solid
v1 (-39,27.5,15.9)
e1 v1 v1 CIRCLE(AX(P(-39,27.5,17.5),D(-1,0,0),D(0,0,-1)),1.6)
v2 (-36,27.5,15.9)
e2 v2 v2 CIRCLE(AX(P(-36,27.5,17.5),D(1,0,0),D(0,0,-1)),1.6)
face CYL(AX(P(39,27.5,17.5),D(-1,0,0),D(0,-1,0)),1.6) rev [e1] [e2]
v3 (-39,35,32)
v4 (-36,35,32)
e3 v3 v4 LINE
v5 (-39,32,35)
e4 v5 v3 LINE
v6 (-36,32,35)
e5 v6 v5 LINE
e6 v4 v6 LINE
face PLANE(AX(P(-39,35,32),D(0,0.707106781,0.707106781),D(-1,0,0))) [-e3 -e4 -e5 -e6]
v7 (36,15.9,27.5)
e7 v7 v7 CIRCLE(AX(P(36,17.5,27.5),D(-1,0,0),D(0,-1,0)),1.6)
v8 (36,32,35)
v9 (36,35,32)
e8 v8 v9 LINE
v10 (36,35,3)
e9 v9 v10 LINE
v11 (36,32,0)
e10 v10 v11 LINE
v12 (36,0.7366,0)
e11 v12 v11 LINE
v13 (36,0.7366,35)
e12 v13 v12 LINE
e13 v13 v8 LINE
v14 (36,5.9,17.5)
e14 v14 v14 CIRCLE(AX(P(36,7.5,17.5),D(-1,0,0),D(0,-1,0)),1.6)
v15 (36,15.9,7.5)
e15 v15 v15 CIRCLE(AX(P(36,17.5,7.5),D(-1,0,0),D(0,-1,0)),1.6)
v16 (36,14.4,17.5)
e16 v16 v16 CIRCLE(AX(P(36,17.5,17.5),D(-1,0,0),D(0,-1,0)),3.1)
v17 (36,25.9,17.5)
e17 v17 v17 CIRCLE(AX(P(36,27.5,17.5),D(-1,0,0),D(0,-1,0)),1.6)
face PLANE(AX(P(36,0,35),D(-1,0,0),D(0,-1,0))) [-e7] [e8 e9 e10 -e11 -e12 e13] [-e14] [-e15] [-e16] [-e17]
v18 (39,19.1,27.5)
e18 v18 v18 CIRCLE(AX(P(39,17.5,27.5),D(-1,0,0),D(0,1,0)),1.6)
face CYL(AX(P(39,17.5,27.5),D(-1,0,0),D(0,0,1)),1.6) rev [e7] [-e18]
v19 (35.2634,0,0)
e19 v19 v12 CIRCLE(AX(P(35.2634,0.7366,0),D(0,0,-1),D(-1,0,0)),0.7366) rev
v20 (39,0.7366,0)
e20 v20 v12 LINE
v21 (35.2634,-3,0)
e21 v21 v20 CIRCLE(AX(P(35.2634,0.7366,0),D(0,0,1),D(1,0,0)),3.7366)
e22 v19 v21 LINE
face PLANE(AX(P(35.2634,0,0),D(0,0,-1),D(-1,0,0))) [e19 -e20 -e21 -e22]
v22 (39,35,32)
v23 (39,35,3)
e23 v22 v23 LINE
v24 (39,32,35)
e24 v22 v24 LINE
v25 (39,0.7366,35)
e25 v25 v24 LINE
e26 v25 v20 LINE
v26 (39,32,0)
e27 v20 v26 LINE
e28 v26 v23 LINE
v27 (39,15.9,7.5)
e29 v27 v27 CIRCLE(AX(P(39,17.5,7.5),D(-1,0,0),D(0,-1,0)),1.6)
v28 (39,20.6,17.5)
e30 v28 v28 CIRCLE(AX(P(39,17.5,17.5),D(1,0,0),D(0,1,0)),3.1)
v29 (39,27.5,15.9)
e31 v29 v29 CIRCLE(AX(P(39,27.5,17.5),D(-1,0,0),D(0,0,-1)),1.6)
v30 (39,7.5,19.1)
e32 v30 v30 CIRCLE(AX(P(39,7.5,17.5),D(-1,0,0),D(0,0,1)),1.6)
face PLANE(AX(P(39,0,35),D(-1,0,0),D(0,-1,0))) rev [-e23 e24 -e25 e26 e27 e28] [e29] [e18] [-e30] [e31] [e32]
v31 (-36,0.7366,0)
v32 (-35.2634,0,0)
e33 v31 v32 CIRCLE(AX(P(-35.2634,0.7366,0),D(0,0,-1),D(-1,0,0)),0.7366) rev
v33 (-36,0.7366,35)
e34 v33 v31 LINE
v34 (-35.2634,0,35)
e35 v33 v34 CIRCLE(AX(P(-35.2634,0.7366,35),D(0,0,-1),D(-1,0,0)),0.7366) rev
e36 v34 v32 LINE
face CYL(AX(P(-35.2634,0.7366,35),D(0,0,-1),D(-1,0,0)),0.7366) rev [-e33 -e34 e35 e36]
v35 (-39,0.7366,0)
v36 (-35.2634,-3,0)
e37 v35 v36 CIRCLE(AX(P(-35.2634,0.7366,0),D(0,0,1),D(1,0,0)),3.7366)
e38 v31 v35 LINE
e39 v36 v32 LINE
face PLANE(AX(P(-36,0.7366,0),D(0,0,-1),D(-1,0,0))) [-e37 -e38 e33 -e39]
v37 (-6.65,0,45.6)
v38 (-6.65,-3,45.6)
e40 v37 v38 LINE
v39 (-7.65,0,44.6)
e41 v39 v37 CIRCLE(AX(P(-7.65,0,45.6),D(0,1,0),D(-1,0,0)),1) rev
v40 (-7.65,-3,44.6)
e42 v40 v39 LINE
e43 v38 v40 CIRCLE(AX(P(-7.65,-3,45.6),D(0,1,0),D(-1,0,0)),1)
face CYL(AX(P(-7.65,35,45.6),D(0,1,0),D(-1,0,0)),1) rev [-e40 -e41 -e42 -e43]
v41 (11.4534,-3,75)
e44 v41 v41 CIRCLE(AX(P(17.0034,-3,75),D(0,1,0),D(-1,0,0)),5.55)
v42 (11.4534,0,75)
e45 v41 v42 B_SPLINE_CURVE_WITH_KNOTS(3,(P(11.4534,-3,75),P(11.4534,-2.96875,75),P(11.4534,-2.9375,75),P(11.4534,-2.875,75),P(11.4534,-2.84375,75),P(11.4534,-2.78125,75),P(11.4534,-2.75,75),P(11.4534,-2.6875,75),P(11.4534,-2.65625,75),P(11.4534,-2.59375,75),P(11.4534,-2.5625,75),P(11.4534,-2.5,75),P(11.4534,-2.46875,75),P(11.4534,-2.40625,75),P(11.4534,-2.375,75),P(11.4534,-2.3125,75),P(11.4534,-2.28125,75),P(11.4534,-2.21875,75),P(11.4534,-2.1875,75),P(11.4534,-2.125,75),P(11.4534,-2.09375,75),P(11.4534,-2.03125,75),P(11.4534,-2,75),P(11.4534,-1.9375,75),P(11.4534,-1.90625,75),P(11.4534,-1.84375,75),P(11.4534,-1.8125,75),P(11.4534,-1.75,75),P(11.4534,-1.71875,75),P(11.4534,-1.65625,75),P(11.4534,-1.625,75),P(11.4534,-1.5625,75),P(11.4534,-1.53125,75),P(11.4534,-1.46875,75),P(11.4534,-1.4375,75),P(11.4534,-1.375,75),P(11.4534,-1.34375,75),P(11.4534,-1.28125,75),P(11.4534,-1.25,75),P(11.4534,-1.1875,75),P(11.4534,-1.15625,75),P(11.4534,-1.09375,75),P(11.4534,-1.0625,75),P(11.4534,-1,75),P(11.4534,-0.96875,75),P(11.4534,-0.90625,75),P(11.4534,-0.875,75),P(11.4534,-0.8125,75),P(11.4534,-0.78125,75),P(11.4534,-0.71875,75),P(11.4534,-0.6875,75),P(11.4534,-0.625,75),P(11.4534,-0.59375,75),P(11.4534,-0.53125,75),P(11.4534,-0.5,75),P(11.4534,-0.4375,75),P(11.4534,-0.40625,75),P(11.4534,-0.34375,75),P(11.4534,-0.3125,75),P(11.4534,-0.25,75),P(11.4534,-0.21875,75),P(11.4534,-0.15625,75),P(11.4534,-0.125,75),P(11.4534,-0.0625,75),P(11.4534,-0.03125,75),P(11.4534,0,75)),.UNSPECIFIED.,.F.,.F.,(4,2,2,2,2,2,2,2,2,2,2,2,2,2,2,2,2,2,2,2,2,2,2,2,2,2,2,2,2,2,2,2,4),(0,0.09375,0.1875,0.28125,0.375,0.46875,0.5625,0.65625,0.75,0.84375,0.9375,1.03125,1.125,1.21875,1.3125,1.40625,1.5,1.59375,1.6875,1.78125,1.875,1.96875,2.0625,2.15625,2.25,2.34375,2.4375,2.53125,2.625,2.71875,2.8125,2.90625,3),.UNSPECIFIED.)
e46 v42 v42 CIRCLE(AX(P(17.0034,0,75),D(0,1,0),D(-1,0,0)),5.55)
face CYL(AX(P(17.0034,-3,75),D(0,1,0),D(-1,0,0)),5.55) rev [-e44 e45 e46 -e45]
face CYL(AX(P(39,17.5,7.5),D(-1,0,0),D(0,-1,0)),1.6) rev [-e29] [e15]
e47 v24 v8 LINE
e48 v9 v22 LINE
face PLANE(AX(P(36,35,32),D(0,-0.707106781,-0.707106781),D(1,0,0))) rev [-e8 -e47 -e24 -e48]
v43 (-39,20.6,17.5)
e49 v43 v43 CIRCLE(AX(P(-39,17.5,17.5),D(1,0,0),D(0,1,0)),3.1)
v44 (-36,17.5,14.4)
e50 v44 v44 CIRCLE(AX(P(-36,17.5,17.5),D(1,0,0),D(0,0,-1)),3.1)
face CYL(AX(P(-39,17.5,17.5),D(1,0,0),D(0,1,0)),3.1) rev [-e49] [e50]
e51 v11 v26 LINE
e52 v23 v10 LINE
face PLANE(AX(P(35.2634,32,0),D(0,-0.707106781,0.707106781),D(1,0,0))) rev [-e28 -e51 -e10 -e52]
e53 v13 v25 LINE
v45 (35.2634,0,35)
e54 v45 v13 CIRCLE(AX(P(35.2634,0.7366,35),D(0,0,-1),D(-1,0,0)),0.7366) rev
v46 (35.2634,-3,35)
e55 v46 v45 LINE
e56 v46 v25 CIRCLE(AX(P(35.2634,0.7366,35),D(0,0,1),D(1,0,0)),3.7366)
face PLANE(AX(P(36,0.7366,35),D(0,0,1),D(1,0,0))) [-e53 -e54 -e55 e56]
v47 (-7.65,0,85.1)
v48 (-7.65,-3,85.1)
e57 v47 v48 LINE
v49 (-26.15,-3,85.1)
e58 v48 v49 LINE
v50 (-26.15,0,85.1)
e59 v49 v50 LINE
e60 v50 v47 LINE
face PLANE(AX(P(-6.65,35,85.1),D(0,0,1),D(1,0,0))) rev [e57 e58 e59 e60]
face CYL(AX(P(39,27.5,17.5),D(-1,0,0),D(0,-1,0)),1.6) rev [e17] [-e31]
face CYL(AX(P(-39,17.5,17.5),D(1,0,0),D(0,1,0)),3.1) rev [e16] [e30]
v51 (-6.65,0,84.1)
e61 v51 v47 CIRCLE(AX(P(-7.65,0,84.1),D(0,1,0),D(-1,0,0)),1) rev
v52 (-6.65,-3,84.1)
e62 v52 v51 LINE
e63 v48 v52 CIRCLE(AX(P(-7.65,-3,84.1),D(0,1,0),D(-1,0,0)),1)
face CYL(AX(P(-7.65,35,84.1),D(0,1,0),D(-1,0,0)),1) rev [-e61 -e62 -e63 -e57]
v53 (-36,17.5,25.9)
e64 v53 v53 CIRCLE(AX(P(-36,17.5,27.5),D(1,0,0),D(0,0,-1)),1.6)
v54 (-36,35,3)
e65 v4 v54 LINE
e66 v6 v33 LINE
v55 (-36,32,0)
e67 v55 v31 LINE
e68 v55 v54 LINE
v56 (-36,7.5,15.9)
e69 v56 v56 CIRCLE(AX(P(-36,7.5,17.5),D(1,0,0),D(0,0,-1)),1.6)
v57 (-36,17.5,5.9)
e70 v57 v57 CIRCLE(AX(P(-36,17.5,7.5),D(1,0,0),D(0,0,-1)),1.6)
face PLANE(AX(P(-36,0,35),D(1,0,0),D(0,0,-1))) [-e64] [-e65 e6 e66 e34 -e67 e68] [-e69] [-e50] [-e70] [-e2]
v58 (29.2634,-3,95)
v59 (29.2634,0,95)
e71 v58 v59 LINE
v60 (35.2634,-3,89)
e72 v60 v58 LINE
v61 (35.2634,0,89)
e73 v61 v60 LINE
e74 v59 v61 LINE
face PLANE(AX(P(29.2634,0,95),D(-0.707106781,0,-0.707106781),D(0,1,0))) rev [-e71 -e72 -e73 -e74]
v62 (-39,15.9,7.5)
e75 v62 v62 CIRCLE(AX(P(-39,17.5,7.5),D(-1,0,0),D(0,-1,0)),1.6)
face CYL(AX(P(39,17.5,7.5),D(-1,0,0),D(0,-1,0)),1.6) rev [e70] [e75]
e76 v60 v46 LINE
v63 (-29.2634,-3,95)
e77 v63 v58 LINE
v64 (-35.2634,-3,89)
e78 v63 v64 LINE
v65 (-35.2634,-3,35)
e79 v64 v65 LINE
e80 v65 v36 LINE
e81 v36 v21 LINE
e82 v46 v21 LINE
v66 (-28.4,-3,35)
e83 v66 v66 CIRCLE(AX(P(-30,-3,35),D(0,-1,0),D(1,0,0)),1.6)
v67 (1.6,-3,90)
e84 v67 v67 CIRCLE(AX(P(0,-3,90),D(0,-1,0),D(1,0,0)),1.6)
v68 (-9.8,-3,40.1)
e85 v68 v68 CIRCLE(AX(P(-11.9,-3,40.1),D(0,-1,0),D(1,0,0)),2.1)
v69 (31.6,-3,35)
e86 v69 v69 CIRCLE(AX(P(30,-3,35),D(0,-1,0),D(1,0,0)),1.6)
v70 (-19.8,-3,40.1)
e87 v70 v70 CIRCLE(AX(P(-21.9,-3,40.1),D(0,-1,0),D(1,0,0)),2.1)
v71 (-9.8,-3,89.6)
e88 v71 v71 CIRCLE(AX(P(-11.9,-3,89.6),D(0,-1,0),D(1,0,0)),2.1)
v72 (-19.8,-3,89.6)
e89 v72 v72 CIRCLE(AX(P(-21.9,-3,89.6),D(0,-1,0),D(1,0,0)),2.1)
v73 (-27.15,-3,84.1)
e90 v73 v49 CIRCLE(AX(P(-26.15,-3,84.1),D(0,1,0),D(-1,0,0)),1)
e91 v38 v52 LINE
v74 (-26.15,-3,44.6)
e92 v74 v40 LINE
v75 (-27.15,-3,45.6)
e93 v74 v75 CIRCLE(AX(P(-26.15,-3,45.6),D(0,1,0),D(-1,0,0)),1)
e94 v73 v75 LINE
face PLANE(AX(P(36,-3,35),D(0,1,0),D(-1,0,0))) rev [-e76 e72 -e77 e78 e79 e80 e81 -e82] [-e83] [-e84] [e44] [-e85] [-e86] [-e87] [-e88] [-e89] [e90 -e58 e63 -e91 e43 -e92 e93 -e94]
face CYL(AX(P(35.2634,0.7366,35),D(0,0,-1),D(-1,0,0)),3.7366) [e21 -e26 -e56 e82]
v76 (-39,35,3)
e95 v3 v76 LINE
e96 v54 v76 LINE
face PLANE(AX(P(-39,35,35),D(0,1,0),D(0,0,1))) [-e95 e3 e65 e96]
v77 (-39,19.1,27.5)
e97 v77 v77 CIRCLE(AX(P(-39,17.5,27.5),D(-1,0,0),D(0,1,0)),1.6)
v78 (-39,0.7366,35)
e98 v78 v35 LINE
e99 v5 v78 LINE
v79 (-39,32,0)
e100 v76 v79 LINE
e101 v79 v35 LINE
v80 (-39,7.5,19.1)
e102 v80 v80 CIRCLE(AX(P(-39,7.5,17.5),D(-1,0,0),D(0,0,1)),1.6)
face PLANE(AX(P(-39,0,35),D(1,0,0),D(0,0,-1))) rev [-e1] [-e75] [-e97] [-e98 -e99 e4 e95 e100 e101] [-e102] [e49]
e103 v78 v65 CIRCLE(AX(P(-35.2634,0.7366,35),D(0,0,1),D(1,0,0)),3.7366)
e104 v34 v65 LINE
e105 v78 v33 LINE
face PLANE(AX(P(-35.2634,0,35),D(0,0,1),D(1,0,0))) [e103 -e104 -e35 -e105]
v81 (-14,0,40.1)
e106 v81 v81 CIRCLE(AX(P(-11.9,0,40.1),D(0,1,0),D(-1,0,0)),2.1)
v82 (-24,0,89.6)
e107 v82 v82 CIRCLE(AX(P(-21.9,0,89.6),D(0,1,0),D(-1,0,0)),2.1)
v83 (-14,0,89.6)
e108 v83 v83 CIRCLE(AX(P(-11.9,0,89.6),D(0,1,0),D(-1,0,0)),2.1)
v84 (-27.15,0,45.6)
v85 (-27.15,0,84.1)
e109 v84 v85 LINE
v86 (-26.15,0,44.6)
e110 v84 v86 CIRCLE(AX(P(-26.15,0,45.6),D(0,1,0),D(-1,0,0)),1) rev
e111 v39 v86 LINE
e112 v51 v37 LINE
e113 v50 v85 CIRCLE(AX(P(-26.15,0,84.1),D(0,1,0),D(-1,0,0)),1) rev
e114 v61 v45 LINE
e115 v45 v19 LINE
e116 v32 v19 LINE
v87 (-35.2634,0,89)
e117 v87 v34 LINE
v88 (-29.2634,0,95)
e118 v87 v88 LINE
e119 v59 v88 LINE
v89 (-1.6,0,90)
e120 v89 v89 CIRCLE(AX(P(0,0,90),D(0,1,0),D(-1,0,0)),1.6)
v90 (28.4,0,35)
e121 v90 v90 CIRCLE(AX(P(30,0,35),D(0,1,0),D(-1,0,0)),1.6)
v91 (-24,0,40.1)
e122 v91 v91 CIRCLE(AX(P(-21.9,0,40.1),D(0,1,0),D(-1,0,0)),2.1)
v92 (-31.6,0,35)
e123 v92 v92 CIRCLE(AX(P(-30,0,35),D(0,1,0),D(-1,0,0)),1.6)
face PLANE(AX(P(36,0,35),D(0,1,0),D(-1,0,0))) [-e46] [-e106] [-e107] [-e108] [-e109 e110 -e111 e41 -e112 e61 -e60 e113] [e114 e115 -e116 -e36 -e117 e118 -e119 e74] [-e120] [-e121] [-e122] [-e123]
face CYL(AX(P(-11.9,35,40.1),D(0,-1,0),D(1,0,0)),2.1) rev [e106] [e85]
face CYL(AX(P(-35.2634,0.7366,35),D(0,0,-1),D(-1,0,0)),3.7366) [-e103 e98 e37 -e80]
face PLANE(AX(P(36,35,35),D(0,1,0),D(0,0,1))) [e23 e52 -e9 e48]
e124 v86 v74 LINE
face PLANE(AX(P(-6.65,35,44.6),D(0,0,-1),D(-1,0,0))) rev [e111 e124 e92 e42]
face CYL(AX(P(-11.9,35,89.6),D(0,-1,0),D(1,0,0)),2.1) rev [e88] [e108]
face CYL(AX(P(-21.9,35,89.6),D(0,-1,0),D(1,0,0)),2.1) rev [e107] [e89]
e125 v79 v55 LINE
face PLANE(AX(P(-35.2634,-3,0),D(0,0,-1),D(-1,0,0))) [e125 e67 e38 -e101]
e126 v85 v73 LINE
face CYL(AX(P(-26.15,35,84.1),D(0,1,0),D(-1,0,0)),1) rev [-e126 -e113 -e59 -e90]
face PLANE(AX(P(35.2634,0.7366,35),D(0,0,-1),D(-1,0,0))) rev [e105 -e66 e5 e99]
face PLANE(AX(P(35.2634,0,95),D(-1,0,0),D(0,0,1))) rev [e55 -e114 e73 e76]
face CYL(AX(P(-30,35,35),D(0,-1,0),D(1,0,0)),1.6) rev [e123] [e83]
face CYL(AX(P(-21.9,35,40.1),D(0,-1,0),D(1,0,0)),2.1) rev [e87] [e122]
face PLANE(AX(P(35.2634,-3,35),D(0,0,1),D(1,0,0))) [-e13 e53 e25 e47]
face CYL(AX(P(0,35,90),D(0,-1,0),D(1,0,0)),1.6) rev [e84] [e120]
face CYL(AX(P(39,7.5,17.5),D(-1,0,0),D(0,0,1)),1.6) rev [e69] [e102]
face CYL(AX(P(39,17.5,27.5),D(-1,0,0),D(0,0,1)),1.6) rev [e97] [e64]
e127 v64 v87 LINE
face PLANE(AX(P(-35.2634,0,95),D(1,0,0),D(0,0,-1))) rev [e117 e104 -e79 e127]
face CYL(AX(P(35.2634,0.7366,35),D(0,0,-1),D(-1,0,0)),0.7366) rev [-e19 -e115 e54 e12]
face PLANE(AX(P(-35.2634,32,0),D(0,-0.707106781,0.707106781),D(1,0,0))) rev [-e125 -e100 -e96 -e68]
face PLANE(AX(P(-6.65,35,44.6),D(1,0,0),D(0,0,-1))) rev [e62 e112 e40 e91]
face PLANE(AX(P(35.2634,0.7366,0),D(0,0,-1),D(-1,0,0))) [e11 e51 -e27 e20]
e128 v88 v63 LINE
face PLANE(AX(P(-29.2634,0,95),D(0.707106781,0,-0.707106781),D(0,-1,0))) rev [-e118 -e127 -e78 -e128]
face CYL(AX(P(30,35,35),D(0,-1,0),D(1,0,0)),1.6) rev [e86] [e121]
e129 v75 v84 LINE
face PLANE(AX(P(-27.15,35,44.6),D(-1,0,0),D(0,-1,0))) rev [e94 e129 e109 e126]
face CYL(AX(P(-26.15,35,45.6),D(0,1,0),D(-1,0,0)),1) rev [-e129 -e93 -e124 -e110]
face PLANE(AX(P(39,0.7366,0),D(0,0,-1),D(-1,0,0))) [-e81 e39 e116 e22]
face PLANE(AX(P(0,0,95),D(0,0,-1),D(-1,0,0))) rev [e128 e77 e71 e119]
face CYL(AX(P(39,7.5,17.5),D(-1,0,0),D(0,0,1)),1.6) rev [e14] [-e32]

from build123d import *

# Parameters (mm, degrees)
SM_BASE_FLANGE_1_DEPTH      = 35
SKETCH_7_W                  = 70.5268
SKETCH_7_H                  = 3
EXTRUDE_1_DEPTH             = 60
SKETCH_8_R                  = 3.1
CUT_EXTRUDE_1_DEPTH         = 128.804538261
SKETCH_9_R                  = 1.6
CUT_EXTRUDE_2_DEPTH         = 128.804538261
PATTERN_CIRCULAR_1_COUNT    = 4
SKETCH_10_W                 = 20.5
SKETCH_10_H                 = 40.5
CUT_EXTRUDE_3_DEPTH         = 110.498858442
SKETCH_11_R                 = 2.1
CUT_EXTRUDE_4_DEPTH         = 110.498858442
PATTERN_LINEAR_1_COUNT      = 2
PATTERN_LINEAR_1_PITCH      = 10
PATTERN_LINEAR_1_COUNT_DIR2 = 2
PATTERN_LINEAR_1_PITCH_DIR2 = 49.5
SKETCH_14_R                 = 5.55
CUT_EXTRUDE_7_DEPTH         = 109.494239478
FILLET_1_R                  = 1
CHAMFER_4_SIZE              = 3
CHAMFER_5_SIZE              = 6
SKETCH_15_R                 = 1.6
CUT_EXTRUDE_8_DEPTH         = 110.498858442
SKETCH_16_R                 = 1.6
CUT_EXTRUDE_9_DEPTH         = 110.498858442
PATTERN_LINEAR_2_COUNT      = 2
PATTERN_LINEAR_2_PITCH      = 60


# Sheet-metal steps are written as plain solids
with BuildPart() as part:
    # Sketch 2 → 基材-凸緣1 (new body)
    with BuildSketch(Plane.XY):
        with BuildLine():
            Line((36, 35), (36, 0.7366))
            ThreePointArc((36, 0.7366), (35.784254855, 0.215745145), (35.2634, 0))
            Line((35.2634, 0), (-35.2634, 0))
            ThreePointArc((-35.2634, 0), (-35.784254855, 0.215745145), (-36, 0.7366))
            Line((-36, 0.7366), (-36, 35))
            Line((-36, 35), (-39, 35))
            Line((-39, 35), (-39, 0.7366))
            ThreePointArc((-39, 0.7366), (-37.905575199, -1.905575199), (-35.2634, -3))
            Line((-35.2634, -3), (35.2634, -3))
            ThreePointArc((35.2634, -3), (37.905575199, -1.905575199), (39, 0.7366))
            Line((39, 0.7366), (39, 35))
            Line((39, 35), (36, 35))
        make_face()
    extrude(amount=SM_BASE_FLANGE_1_DEPTH)

    # 草圖7 → 填料-伸長1 (add)
    with BuildSketch(Plane.XY.offset(35)):
        with Locations((0, -1.5)):
            Rectangle(SKETCH_7_W, SKETCH_7_H)
    extrude(amount=EXTRUDE_1_DEPTH)

    # 草圖8 → 除料-伸長1 (cut, through all)
    with BuildSketch(Plane(origin=(39, 0, 0), x_dir=(0, 0, -1), z_dir=(1, 0, 0))):
        with Locations(Location((-17.5, 17.5, 0), (0, 0, 90))):
            Circle(SKETCH_8_R)
    extrude(amount=-CUT_EXTRUDE_1_DEPTH, mode=Mode.SUBTRACT)

    # 草圖9 → 除料-伸長2 (cut, through all)
    with BuildSketch(Plane.ZY.offset(39)):
        with Locations((17.5, 7.5)):
            Circle(SKETCH_9_R)
    cut_extrude_2 = extrude(amount=-CUT_EXTRUDE_2_DEPTH, mode=Mode.SUBTRACT)

    # 環狀複製排列1: 除料-伸長2 ×4 about axis
    pattern_circular_1_axis = Axis((0, 17.5, 17.5), (1, 0, 0))
    for i in range(1, PATTERN_CIRCULAR_1_COUNT):
        add(cut_extrude_2.rotate(pattern_circular_1_axis, i * 360 / PATTERN_CIRCULAR_1_COUNT), mode=Mode.SUBTRACT)

    # 草圖10 → 除料-伸長3 (cut, through all)
    with BuildSketch(Plane.XZ.offset(3)):
        with Locations((-16.9, 64.85)):
            Rectangle(SKETCH_10_W, SKETCH_10_H)
    extrude(amount=-CUT_EXTRUDE_3_DEPTH, mode=Mode.SUBTRACT)

    # 草圖11 → 除料-伸長4 (cut, through all)
    with BuildSketch(Plane.XZ.offset(3)):
        with Locations((-21.9, 89.6)):
            Circle(SKETCH_11_R)
    cut_extrude_4 = extrude(amount=-CUT_EXTRUDE_4_DEPTH, mode=Mode.SUBTRACT)

    # 直線複製排列1: Cut-Extrude 4 2 × 2
    with Locations(*[(i * PATTERN_LINEAR_1_PITCH, 0, -j * PATTERN_LINEAR_1_PITCH_DIR2) for i in range(PATTERN_LINEAR_1_COUNT) for j in range(PATTERN_LINEAR_1_COUNT_DIR2) if (i, j) != (0, 0)]):
        add(cut_extrude_4, mode=Mode.SUBTRACT)

    # 草圖14 → 除料-伸長7 (cut, through all)
    with BuildSketch(Plane(origin=(0, 0, 0), x_dir=(1, 0, 0), z_dir=(0, 1, 0))):
        with Locations(Location((17.0034, -75, 0), (0, 0, 180))):
            Circle(SKETCH_14_R)
    extrude(amount=-CUT_EXTRUDE_7_DEPTH, mode=Mode.SUBTRACT)

    # 圓角1
    fillet_1_edges = [part.edges().sort_by_distance(p)[0] for p in [
        (-6.65, -1.5, 85.1),
        (-6.65, -1.5, 44.6),
        (-27.15, -1.5, 44.6),
        (-27.15, -1.5, 85.1),
    ]]
    fillet(fillet_1_edges, radius=FILLET_1_R)

    # 導角4
    chamfer_4_edges = [part.edges().sort_by_distance(p)[0] for p in [
        (-37.5, 35, 0),
        (37.5, 35, 0),
        (-37.5, 35, 35),
        (37.5, 35, 35),
    ]]
    chamfer(chamfer_4_edges, length=CHAMFER_4_SIZE)

    # 導角5
    chamfer_5_edges = [part.edges().sort_by_distance(p)[0] for p in [
        (35.2634, -1.5, 95),
        (-35.2634, -1.5, 95),
    ]]
    chamfer(chamfer_5_edges, length=CHAMFER_5_SIZE)

    # 草圖15 → 除料-伸長8 (cut, through all)
    with BuildSketch(Plane.XZ.offset(3)):
        with Locations((0, 90)):
            Circle(SKETCH_15_R)
    extrude(amount=-CUT_EXTRUDE_8_DEPTH, mode=Mode.SUBTRACT)

    # 草圖16 → 除料-伸長9 (cut, through all)
    with BuildSketch(Plane.XZ.offset(3)):
        with Locations((30, 35)):
            Circle(SKETCH_16_R)
    cut_extrude_9 = extrude(amount=-CUT_EXTRUDE_9_DEPTH, mode=Mode.SUBTRACT)

    # 直線複製排列2: 除料-伸長9 ×2
    with Locations(*[(-i * PATTERN_LINEAR_2_PITCH, 0, 0) for i in range(1, PATTERN_LINEAR_2_COUNT)]):
        add(cut_extrude_9, mode=Mode.SUBTRACT)


solid = part.part
